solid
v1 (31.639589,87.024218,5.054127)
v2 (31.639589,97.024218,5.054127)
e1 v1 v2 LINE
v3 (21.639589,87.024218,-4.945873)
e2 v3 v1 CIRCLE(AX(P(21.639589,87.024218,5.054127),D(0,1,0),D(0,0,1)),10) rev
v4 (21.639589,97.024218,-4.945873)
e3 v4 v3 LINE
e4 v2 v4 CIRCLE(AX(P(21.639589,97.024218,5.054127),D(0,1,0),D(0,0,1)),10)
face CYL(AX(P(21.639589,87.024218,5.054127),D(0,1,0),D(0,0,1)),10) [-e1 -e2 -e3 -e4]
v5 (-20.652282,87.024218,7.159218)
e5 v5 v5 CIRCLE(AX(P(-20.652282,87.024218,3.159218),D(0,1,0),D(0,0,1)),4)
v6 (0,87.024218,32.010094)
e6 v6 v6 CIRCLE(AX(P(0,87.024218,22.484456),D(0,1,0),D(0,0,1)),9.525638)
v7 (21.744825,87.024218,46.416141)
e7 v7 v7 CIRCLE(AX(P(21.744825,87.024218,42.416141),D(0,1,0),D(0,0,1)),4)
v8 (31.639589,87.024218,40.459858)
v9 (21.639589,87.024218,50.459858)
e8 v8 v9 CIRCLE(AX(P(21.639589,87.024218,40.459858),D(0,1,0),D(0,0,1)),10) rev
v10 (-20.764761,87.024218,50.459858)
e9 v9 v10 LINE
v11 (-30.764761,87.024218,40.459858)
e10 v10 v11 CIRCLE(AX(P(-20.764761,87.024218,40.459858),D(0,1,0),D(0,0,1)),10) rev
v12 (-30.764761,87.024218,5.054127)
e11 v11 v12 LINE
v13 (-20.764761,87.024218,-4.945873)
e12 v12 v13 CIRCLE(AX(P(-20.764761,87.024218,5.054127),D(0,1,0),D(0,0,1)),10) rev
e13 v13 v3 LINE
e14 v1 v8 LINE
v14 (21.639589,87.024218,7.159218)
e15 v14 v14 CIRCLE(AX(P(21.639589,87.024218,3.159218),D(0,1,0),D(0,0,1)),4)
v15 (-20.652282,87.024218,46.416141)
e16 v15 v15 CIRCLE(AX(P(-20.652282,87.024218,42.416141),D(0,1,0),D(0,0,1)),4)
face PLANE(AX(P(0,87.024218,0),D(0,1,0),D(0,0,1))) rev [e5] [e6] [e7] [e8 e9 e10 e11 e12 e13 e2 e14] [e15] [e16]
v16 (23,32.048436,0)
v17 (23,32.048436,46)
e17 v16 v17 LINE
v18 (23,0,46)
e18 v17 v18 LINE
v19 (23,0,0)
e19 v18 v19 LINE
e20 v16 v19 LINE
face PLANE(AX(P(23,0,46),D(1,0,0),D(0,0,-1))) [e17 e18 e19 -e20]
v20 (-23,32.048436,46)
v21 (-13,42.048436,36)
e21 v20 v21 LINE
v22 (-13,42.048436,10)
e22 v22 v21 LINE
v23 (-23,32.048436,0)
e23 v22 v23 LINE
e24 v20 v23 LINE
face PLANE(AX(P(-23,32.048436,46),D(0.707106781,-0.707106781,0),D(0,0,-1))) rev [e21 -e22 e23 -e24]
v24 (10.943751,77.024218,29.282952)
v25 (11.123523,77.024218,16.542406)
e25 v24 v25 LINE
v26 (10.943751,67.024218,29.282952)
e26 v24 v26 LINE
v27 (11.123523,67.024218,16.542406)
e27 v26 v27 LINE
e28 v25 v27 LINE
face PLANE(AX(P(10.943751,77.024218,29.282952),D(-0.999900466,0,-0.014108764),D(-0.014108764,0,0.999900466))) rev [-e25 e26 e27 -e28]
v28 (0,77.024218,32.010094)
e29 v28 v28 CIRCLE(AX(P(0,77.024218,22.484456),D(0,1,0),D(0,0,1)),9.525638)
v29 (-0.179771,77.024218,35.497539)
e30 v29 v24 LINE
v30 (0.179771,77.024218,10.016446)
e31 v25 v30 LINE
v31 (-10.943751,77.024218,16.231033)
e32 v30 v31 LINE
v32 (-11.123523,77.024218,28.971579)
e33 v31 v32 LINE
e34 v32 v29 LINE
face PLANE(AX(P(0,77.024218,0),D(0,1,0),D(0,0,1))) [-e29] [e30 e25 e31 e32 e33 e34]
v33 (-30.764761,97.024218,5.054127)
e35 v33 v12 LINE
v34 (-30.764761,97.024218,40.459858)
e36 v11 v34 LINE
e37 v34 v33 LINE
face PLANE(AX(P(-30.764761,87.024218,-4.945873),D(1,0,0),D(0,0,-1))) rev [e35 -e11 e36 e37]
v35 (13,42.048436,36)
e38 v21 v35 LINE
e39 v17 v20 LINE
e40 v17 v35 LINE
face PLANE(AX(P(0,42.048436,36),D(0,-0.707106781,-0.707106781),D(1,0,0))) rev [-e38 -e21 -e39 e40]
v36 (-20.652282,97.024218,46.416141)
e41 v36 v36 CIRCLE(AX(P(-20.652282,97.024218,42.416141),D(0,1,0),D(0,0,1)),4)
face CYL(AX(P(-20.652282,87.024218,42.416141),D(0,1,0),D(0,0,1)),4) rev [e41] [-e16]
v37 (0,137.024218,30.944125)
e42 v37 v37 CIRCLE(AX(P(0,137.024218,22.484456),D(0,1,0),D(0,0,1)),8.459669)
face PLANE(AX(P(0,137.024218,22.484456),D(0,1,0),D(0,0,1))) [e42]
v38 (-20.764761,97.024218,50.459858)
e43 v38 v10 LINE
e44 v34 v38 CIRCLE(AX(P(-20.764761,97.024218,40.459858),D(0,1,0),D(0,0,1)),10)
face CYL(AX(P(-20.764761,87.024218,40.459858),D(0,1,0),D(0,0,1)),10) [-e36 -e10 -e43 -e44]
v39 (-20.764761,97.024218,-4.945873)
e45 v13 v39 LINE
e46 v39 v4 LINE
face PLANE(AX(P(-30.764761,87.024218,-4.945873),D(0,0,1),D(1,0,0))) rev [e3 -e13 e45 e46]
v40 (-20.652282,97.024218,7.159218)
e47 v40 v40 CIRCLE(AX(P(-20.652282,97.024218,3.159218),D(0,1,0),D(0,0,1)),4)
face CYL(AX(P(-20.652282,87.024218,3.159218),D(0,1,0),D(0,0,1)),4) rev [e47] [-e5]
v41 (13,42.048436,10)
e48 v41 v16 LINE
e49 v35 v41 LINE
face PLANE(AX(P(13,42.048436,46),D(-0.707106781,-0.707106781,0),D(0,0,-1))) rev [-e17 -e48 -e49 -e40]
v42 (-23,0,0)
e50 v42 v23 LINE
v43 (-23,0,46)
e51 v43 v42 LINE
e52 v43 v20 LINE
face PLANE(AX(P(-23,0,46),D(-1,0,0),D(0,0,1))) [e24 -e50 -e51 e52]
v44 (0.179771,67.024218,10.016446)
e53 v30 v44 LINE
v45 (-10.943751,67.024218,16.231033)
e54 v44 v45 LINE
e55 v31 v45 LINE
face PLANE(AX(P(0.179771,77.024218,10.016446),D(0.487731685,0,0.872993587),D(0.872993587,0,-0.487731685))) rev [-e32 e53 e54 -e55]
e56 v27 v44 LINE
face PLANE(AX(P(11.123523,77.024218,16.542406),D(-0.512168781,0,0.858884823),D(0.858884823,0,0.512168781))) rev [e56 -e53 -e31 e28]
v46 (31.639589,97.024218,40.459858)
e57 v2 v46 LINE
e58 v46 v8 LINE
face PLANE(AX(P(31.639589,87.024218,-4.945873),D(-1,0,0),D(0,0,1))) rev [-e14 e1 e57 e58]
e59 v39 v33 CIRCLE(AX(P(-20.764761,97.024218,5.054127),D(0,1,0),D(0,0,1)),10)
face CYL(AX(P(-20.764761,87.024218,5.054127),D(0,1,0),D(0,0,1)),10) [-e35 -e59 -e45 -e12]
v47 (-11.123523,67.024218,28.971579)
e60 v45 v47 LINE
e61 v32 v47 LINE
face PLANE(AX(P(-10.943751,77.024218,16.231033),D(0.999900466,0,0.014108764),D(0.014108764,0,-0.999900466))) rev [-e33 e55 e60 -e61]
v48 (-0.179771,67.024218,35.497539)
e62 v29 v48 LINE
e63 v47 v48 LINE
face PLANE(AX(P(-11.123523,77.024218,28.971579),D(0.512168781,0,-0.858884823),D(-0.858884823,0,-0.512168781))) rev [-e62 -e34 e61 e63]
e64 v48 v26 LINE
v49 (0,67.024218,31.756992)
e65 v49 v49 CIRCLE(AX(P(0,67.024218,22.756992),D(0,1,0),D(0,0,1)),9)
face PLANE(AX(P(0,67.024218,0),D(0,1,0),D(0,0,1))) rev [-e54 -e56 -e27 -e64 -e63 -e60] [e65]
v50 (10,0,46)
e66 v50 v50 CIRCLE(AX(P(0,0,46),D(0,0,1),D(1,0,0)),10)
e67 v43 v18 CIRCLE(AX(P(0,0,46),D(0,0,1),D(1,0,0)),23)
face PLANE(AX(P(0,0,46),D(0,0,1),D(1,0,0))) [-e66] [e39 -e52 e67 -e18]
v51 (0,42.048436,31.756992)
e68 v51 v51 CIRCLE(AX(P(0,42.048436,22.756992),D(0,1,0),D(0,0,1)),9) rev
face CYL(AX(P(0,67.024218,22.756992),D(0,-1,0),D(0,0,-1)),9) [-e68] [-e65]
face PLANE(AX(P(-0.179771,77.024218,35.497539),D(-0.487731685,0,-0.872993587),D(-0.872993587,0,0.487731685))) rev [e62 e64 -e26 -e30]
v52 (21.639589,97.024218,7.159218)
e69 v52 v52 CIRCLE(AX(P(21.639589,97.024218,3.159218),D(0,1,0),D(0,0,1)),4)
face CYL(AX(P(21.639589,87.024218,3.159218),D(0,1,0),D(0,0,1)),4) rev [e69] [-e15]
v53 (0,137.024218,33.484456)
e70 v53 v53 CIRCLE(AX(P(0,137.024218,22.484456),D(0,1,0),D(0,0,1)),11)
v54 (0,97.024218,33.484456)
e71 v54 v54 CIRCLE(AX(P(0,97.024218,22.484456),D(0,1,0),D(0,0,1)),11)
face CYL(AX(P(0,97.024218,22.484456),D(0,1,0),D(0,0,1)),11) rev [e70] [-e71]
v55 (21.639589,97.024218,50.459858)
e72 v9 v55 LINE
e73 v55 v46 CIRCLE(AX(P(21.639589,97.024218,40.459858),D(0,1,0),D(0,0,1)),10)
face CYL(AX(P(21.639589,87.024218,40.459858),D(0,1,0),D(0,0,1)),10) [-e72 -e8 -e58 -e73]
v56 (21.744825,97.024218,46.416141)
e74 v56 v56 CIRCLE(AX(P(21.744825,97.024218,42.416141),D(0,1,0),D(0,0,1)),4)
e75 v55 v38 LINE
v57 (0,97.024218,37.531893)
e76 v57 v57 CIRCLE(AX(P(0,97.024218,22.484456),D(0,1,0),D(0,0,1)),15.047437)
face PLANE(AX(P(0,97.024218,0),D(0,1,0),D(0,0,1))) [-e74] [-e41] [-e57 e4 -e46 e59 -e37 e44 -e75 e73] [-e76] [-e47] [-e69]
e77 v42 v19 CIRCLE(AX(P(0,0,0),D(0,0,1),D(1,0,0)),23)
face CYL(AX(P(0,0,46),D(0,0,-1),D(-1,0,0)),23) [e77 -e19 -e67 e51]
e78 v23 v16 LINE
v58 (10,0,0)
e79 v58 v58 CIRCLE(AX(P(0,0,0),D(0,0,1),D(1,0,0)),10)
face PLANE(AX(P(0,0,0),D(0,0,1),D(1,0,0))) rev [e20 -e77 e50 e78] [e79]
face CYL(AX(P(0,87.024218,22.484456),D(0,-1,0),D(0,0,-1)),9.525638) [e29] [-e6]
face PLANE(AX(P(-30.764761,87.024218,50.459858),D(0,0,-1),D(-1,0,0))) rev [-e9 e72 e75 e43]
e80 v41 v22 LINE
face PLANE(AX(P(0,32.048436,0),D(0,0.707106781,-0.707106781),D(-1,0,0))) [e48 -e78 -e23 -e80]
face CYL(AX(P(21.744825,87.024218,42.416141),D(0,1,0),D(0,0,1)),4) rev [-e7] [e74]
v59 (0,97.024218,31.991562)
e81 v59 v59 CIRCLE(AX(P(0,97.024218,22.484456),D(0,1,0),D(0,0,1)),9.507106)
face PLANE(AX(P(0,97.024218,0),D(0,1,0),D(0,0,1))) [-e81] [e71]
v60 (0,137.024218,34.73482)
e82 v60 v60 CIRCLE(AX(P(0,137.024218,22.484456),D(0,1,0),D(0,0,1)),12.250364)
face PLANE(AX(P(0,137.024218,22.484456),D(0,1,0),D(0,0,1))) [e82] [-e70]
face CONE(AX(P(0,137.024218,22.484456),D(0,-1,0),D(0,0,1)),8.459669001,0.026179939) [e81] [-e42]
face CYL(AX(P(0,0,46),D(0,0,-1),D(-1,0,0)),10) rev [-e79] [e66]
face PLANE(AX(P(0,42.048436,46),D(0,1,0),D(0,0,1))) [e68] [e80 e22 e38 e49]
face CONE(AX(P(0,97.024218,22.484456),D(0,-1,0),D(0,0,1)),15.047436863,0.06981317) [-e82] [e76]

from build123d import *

# Parameters (mm, degrees)
SKETCH1_R           = 10
SKETCH1_W           = 46
SKETCH1_H           = 19.048435613
BOSS_EXTRUDE1_DEPTH = 46
CHAMFER1_SIZE       = 10
SKETCH2_R           = 9
BOSS_EXTRUDE2_DEPTH = 46
BOSS_EXTRUDE4_DEPTH = 10
SKETCH6_R           = 9.525638377
BOSS_EXTRUDE5_DEPTH = 10
SKETCH8_R           = 8.459669001
BOSS_EXTRUDE6_DEPTH = 50
DRAFT1_ANGLE        = 1
SKETCH9_R           = 14
SKETCH9_R_2         = 11
BOSS_EXTRUDE8_DEPTH = 40
DRAFT10_ANGLE       = 1.5
SKETCH12_W          = 62.404350154
SKETCH12_H          = 55.405731445
BOSS_EXTRUDE9_DEPTH = 10
FILLET1_R           = 10
FILLET2_R           = 10
SKETCH13_R          = 4
CUT_EXTRUDE3_DEPTH  = 10
DRAFT11_ANGLE       = 2
DRAFT12_ANGLE       = 4
DRAFT13_ANGLE       = 1
DRAFT14_ANGLE       = 1.5


# Read off the part's stored shape, not the designer's step: Draft7, Draft16
with BuildPart() as part:
    # Sketch1 → Boss-Extrude1 (new body)
    # profile 1 of 2: a face of its own
    with BuildSketch(Plane.XY):
        with BuildLine():
            Line((-23, 23), (-23, 0))
            ThreePointArc((-23, 0), (0, -23), (23, 0))
            Line((23, 0), (23, 23))
            Line((23, 23), (-23, 23))
        make_face()
        Circle(SKETCH1_R, mode=Mode.SUBTRACT)
    # profile 2 of 2: a face of its own
    with BuildSketch(Plane.XY):
        with Locations((0, 32.524217807)):
            Rectangle(SKETCH1_W, SKETCH1_H)
    extrude(amount=BOSS_EXTRUDE1_DEPTH)

    # Chamfer1
    chamfer1_edges = [part.edges().sort_by_distance(p)[0] for p in [
        (-23, 42.048435613, 23),
        (23, 42.048435613, 23),
        (0, 42.048435613, 46),
        (0, 42.048435613, 0),
    ]]
    chamfer(chamfer1_edges, length=CHAMFER1_SIZE)

    # Sketch2 → Boss-Extrude2 (add)
    with BuildSketch(Plane(origin=(0, 21.024217806, 0), x_dir=(1, 0, 0), z_dir=(0, 1, 0))):
        with Locations(Location((0, -22.756992406, 0), (0, 0, 270))):
            Circle(SKETCH2_R)
    extrude(amount=BOSS_EXTRUDE2_DEPTH)

    # Sketch5 → Boss-Extrude4 (add)
    with BuildSketch(Plane(origin=(0, 67.024217806, 0), x_dir=(1, 0, 0), z_dir=(0, 1, 0))):
        Polygon((10.943751373, -29.282952175), (11.123522631, -16.542405589), (0.179771258, -10.01644582), (-10.943751373, -16.231032637), (-11.123522631, -28.971579223), (-0.179771258, -35.497538992), align=None)
    extrude(amount=BOSS_EXTRUDE4_DEPTH)

    # Sketch6 → Boss-Extrude5 (add)
    with BuildSketch(Plane(origin=(0, 77.024217806, 0), x_dir=(1, 0, 0), z_dir=(0, 1, 0))):
        with Locations(Location((0, -22.484455751, 0), (0, 0, 270))):
            Circle(SKETCH6_R)
    extrude(amount=BOSS_EXTRUDE5_DEPTH)

    # Sketch8 → Boss-Extrude6 (add)
    with BuildSketch(Plane(origin=(0, 87.024217806, 0), x_dir=(1, 0, 0), z_dir=(0, 1, 0))):
        with Locations(Location((0, -22.484455751, 0), (0, 0, 270))):
            Circle(SKETCH8_R)
    extrude(amount=BOSS_EXTRUDE6_DEPTH)

    # Draft1
    draft1_faces = [part.faces().sort_by_distance(p)[0] for p in [
        (0, 112.024217806, 14.02478675),
    ]]
    draft(draft1_faces, Plane(origin=(0, 137.024217806, 22.484455751), x_dir=(0, 0, 1), z_dir=(0, 1, 0)), DRAFT1_ANGLE)

    # Draft7 outline → Draft7 (revolve)
    with BuildSketch(Plane.XY.offset(22.484455751)):
        Polygon((9.525638377, 87.024217806), (9.525638377, 96.316489669), (8.459669001, 137.024217806), (9.332422247, 87.024217806), align=None)
    revolve(axis=Axis((0, 0, 22.484455751), (0, 1, 0)))



with BuildPart() as body_2:
    # Sketch9 → Boss-Extrude8 (new body)
    with BuildSketch(Plane(origin=(0, 137.024217806, 0), x_dir=(1, 0, 0), z_dir=(0, 1, 0))):
        with Locations(Location((0, -22.484455751, 0), (0, 0, 270))):
            Circle(SKETCH9_R)
        with Locations(Location((0, -22.484455751, 0), (0, 0, 270))):
            Circle(SKETCH9_R_2, mode=Mode.SUBTRACT)
    extrude(amount=-BOSS_EXTRUDE8_DEPTH)

    # Draft10
    draft10_faces = [body_2.faces().sort_by_distance(p)[0] for p in [
        (0, 117.024217806, 8.484455751),
    ]]
    draft(draft10_faces, Plane(origin=(0, 137.024217806, 22.484455751), x_dir=(0, 0, 1), z_dir=(0, 1, 0)), DRAFT10_ANGLE)


with BuildPart() as part_1:
    add(part.part)

    add(body_2.part)  # Boss-Extrude9 merges body 2
    # Sketch12 → Boss-Extrude9 (add)
    with BuildSketch(Plane(origin=(0, 97.024217806, 0), x_dir=(-1, 0, 0), z_dir=(0, -1, 0))):
        with Locations((-0.437413669, -22.756992406)):
            Rectangle(SKETCH12_W, SKETCH12_H)
    extrude(amount=BOSS_EXTRUDE9_DEPTH)

    # Fillet1
    fillet1_edges = [part_1.edges().sort_by_distance(p)[0] for p in [
        (-30.764761408, 92.024217806, 50.459858128),
        (31.639588746, 92.024217806, -4.945873317),
        (31.639588746, 92.024217806, 50.459858128),
    ]]
    fillet(fillet1_edges, radius=FILLET1_R)

    # Fillet2
    fillet2_edges = [part_1.edges().sort_by_distance(p)[0] for p in [
        (-30.764761408, 92.024217806, -4.945873317),
    ]]
    fillet(fillet2_edges, radius=FILLET2_R)

    # Sketch13 → Cut-Extrude3 (cut)
    with BuildSketch(Plane(origin=(0, 97.024217806, 0), x_dir=(1, 0, 0), z_dir=(0, 1, 0))):
        with Locations(Location((-20.652282418, -42.41614068, 0), (0, 0, 270))):
            Circle(SKETCH13_R)
        with Locations(Location((21.744824706, -42.41614068, 0), (0, 0, 270))):
            Circle(SKETCH13_R)
        with Locations(Location((-20.652282418, -3.159218326, 0), (0, 0, 270))):
            Circle(SKETCH13_R)
        with Locations(Location((21.639588746, -3.159218326, 0), (0, 0, 270))):
            Circle(SKETCH13_R)
    extrude(amount=-CUT_EXTRUDE3_DEPTH, mode=Mode.SUBTRACT)

    # Draft11
    draft11_faces = [part_1.faces().sort_by_distance(p)[0] for p in [
        (0, 117.024217806, 7.960737319),
    ]]
    draft(draft11_faces, Plane(origin=(0, 137.024217806, 22.484455751), x_dir=(0, 0, 1), z_dir=(0, 1, 0)), DRAFT11_ANGLE)

    # Draft12
    draft12_faces = [part_1.faces().sort_by_distance(p)[0] for p in [
        (0, 117.024217806, 7.786040361),
    ]]
    draft(draft12_faces, Plane(origin=(0, 137.024217806, 22.484455751), x_dir=(0, 0, 1), z_dir=(0, 1, 0)), DRAFT12_ANGLE)

    # Draft13
    draft13_faces = [part_1.faces().sort_by_distance(p)[0] for p in [
        (0, 117.024217806, 7.085919512),
    ]]
    draft(draft13_faces, Plane(origin=(0, 137.024217806, 22.484455751), x_dir=(0, 0, 1), z_dir=(0, 1, 0)), DRAFT13_ANGLE)

    # Draft14
    draft14_faces = [part_1.faces().sort_by_distance(p)[0] for p in [
        (0, 117.024217806, 8.135354452),
    ]]
    draft(draft14_faces, Plane(origin=(0, 137.024217806, 22.484455751), x_dir=(0, 0, 1), z_dir=(0, 1, 0)), DRAFT14_ANGLE)

    # Draft16 outline → Draft16 (revolve, cut)
    with BuildSketch(Plane.XY.offset(22.484455751)):
        Polygon((14, 137.024217806), (12.250364385, 137.024217806), (15.047436863, 97.024217806), align=None)
    revolve(axis=Axis((0, 0, 22.484455751), (0, 1, 0)), mode=Mode.SUBTRACT)


solid = part_1.part
